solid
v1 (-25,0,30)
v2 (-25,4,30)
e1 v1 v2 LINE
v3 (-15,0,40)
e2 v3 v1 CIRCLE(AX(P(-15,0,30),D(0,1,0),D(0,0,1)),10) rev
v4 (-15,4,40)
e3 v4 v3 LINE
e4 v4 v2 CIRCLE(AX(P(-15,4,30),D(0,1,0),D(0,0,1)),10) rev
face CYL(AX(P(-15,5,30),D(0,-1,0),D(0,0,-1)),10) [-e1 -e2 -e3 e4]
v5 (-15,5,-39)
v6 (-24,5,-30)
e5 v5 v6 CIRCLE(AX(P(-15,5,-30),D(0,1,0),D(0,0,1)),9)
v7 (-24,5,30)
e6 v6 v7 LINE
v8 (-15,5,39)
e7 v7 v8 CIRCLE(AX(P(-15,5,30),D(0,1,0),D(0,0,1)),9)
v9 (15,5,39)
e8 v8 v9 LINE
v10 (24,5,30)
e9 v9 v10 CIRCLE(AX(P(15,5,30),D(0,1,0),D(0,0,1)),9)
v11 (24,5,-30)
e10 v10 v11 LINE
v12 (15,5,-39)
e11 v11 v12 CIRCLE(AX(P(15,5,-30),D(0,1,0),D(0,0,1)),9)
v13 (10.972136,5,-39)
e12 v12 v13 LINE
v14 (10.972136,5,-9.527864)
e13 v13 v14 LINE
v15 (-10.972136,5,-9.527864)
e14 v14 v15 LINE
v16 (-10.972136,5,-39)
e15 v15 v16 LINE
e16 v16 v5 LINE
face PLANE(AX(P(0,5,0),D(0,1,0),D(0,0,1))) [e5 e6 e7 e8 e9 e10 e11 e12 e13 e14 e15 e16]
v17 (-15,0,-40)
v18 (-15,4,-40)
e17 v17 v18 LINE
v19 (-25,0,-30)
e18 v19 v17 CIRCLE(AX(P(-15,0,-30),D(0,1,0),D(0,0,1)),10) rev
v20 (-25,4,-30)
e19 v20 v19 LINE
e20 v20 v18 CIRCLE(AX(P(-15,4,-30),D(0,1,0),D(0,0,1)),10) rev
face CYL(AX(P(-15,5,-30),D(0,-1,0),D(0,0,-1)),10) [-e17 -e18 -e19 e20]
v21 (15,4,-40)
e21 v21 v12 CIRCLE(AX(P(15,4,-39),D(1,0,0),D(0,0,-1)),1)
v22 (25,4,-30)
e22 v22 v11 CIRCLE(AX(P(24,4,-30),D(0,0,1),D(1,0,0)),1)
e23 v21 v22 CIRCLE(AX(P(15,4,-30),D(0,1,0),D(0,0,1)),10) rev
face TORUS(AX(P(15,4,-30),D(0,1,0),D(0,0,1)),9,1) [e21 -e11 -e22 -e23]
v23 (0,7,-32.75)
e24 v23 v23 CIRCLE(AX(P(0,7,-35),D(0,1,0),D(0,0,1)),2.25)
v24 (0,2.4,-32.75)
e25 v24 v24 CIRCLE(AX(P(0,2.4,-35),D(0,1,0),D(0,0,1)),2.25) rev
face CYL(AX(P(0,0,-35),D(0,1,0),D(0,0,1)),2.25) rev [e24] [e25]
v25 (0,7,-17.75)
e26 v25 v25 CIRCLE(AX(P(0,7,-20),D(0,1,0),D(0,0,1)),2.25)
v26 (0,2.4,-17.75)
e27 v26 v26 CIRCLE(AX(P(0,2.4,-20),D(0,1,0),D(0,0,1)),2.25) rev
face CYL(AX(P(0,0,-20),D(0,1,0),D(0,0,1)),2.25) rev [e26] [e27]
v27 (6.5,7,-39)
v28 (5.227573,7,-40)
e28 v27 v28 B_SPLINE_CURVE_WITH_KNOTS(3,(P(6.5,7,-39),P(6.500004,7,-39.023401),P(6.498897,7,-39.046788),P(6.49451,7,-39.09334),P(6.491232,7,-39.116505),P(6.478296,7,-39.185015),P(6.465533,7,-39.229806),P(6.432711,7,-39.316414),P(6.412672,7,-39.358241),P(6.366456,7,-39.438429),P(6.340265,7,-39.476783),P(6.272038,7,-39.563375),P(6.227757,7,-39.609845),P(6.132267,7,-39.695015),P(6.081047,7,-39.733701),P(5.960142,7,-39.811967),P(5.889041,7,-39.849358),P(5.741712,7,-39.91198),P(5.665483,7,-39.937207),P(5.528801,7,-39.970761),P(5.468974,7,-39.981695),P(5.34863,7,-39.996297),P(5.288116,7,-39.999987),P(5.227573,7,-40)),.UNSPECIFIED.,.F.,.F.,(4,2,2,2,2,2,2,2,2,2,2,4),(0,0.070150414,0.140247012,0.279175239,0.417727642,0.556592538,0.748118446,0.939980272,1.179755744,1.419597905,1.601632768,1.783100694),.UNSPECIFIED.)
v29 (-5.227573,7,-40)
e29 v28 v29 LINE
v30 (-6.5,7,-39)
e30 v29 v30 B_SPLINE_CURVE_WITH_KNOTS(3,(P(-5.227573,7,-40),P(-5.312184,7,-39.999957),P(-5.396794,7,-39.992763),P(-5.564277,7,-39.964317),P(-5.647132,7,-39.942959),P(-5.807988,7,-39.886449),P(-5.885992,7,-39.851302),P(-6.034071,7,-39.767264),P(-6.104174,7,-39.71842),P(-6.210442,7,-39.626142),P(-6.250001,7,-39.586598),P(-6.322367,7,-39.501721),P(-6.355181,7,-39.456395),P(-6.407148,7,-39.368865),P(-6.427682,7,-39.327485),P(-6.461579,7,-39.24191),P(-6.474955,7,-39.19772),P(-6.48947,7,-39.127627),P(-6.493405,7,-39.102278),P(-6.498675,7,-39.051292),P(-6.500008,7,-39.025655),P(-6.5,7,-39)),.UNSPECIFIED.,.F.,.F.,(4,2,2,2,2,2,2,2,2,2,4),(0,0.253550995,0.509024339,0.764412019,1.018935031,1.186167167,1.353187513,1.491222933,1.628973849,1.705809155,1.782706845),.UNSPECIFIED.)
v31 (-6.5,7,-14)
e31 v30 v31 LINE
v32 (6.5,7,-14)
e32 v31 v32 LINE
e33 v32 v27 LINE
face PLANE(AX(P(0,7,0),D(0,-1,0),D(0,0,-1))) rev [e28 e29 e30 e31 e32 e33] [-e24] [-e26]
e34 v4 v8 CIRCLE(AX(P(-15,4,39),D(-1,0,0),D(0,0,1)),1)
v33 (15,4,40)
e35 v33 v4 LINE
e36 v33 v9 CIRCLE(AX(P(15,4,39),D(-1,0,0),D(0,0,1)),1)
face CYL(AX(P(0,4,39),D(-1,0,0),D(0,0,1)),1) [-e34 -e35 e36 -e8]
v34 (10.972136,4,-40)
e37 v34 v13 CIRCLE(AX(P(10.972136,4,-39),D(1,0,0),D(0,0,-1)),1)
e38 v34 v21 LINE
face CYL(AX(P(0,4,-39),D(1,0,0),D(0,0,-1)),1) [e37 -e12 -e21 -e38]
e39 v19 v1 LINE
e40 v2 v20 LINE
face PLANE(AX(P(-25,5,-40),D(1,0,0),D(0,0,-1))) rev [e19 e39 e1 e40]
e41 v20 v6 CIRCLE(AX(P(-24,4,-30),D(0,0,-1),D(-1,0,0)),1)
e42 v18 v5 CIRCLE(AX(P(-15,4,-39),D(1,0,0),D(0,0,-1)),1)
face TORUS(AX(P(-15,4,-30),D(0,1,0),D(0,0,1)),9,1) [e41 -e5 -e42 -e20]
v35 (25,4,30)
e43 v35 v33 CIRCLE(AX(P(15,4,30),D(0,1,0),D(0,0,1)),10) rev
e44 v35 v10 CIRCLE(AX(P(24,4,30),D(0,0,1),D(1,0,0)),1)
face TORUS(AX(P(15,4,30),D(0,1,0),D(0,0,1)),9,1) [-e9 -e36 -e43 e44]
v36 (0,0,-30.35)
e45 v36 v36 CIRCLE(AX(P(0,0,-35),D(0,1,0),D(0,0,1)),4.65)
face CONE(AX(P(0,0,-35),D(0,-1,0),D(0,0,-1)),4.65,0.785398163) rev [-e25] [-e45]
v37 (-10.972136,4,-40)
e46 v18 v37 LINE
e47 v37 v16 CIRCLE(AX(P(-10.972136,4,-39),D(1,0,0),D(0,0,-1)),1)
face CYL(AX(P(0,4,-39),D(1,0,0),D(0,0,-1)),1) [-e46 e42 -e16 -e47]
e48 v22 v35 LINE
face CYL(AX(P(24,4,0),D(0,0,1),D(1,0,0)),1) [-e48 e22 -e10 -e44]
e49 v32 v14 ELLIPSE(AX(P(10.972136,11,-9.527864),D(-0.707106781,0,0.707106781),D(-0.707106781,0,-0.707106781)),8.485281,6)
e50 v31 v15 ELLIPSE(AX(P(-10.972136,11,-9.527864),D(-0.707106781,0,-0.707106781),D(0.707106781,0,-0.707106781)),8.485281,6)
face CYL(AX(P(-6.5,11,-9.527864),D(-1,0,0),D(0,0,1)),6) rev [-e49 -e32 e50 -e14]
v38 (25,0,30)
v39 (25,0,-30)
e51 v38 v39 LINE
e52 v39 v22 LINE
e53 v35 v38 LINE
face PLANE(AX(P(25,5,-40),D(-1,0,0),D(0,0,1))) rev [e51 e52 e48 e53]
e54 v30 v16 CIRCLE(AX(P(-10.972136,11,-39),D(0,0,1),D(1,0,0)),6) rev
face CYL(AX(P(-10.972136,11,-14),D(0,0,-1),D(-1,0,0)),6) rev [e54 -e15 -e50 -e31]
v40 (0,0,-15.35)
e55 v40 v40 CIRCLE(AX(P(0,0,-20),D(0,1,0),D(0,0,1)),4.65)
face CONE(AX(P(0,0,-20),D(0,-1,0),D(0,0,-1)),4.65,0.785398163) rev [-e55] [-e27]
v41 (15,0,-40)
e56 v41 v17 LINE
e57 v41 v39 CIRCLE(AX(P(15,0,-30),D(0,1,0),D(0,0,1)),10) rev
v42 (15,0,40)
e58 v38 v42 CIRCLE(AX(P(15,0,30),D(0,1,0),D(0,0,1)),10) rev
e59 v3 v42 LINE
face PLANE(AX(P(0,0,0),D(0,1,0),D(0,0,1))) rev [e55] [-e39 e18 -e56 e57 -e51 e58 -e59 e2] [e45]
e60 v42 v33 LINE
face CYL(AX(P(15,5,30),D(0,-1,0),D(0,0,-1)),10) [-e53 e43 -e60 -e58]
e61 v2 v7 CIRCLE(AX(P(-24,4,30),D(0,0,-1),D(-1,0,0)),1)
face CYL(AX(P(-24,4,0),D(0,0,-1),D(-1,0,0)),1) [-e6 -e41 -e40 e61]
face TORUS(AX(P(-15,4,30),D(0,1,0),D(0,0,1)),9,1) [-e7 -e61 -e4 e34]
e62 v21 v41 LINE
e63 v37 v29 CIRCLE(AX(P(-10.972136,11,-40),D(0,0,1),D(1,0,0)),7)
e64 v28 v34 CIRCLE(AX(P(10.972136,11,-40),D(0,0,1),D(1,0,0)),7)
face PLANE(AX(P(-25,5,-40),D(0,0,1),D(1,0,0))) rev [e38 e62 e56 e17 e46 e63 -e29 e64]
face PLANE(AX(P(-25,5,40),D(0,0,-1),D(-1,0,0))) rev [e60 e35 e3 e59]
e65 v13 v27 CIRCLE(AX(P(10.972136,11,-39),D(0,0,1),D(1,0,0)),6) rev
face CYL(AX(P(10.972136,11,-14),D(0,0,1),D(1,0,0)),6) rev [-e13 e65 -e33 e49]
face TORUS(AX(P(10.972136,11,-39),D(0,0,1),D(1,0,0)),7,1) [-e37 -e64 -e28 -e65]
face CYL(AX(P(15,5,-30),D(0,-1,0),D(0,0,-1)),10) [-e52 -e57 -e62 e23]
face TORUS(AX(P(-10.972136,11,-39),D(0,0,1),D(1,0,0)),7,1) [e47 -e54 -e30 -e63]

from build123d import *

# Parameters (mm, degrees)
SKETCH1_W           = 50
SKETCH1_H           = 80
BOSS_EXTRUDE1_DEPTH = 5
SKETCH2_W           = 13
SKETCH2_H           = 26
BOSS_EXTRUDE2_DEPTH = 2
SKETCH3_R           = 2.25
CUT_EXTRUDE1_DEPTH  = 48.68647607
FILLET1_R           = 10
FILLET2_R           = 6
FILLET3_R           = 1
CHAMFER1_SIZE       = 2.4


with BuildPart() as part:
    # Sketch1 → Boss-Extrude1 (new body)
    with BuildSketch(Plane(origin=(0, 0, 0), x_dir=(1, 0, 0), z_dir=(0, 1, 0))):
        Rectangle(SKETCH1_W, SKETCH1_H)
    extrude(amount=BOSS_EXTRUDE1_DEPTH)

    # Sketch2 → Boss-Extrude2 (add)
    with BuildSketch(Plane(origin=(0, 5, 0), x_dir=(1, 0, 0), z_dir=(0, 1, 0))):
        with Locations((0, 27)):
            Rectangle(SKETCH2_W, SKETCH2_H)
    extrude(amount=BOSS_EXTRUDE2_DEPTH)

    # Sketch3 → Cut-Extrude1 (cut, through all)
    with BuildSketch(Plane(origin=(0, 7, 0), x_dir=(1, 0, 0), z_dir=(0, 1, 0))):
        with Locations(Location((0, 35, 0), (0, 0, 270))):
            Circle(SKETCH3_R)
        with Locations(Location((0, 20, 0), (0, 0, 270))):
            Circle(SKETCH3_R)
    extrude(amount=-CUT_EXTRUDE1_DEPTH, mode=Mode.SUBTRACT)

    # Fillet1
    fillet1_edges = [part.edges().sort_by_distance(p)[0] for p in [
        (25, 2.5, 40),
        (-25, 2.5, 40),
        (-25, 2.5, -40),
        (25, 2.5, -40),
    ]]
    fillet(fillet1_edges, radius=FILLET1_R)

    # Fillet2
    # the kernel refuses this fillet: 6 mm, written as the material it adds along each edge
    with BuildSketch(Plane(origin=(6.5, 5, -14), x_dir=(1, 0, 0), z_dir=(0, 0, -1)), Plane(origin=(-6.5, 5, -40), x_dir=(-1, 0, 0), z_dir=(0, 0, 1))) as fillet2_piece_1:
        with BuildLine():
            CenterArc((4.472135955, -6), FILLET2_R, 90, 48.189685104)
            Line((0, -2), (-0.089442719, -1.92))
            ThreePointArc((-0.089442719, -1.92), (-0.12, -1), (-0.12, 0))
            Line((-0.12, 0), (0, 0.12))
            Line((0, 0.12), (4.472135955, 0.12))
            Line((4.472135955, 0.12), (4.472135955, 0))
        make_face()
    extrude(amount=26)
    with BuildSketch(Plane(origin=(-6.5, 5, -14), x_dir=(0, 0, 1), z_dir=(1, 0, 0))) as fillet2_piece_2:
        with BuildLine():
            CenterArc((4.472135955, -6), FILLET2_R, 90, 48.189685104)
            Line((0, -2), (-0.089442719, -1.92))
            ThreePointArc((-0.089442719, -1.92), (-0.12, -1), (-0.12, 0))
            Line((-0.12, 0), (0, 0.12))
            Line((0, 0.12), (4.472135955, 0.12))
            Line((4.472135955, 0.12), (4.472135955, 0))
        make_face()
    extrude(amount=13)
    with BuildSketch(Plane(origin=(-6.5, 5, -14), x_dir=(0, 0, 1), z_dir=(1, 0, 0))) as fillet2_piece_3a_section:
        with BuildLine():
            CenterArc((4.472135955, -6), FILLET2_R, 90, 48.189685104)
            Line((0, -2), (-0.089442719, -1.92))
            ThreePointArc((-0.089442719, -1.92), (-0.12, -1), (-0.12, 0))
            Line((-0.12, 0), (0, 0.12))
            Line((0, 0.12), (4.472135955, 0.12))
            Line((4.472135955, 0.12), (4.472135955, 0))
        make_face()
    fillet2_piece_3a = extrude(amount=24.180339887, mode=Mode.PRIVATE)
    fillet2_piece_3a = split(fillet2_piece_3a, bisect_by=Plane(origin=(6.5, 5.502082099, -12.82079949), z_dir=(1, 0, 0)), keep=Keep.TOP, mode=Mode.PRIVATE)
    with BuildSketch(Plane(origin=(6.5, 5, -2.819660113), x_dir=(1, 0, 0), z_dir=(0, 0, -1))) as fillet2_piece_3b_section:
        with BuildLine():
            CenterArc((4.472135955, -6), FILLET2_R, 90, 48.189685104)
            Line((0, -2), (-0.089442719, -1.92))
            ThreePointArc((-0.089442719, -1.92), (-0.12, -1), (-0.12, 0))
            Line((-0.12, 0), (0, 0.12))
            Line((0, 0.12), (4.472135955, 0.12))
            Line((4.472135955, 0.12), (4.472135955, 0))
        make_face()
    fillet2_piece_3b = extrude(amount=37.180339887, mode=Mode.PRIVATE)
    fillet2_piece_3b = split(fillet2_piece_3b, bisect_by=Plane(origin=(7.67920051, 5.502082099, -14), z_dir=(0, 0, 1)), keep=Keep.TOP, mode=Mode.PRIVATE)
    fillet2_piece_3 = fillet2_piece_3a & fillet2_piece_3b
    add(fillet2_piece_3)
    with BuildSketch(Plane(origin=(-6.5, 5, -40), x_dir=(-1, 0, 0), z_dir=(0, 0, 1))) as fillet2_piece_4a_section:
        with BuildLine():
            CenterArc((4.472135955, -6), FILLET2_R, 90, 48.189685104)
            Line((0, -2), (-0.089442719, -1.92))
            ThreePointArc((-0.089442719, -1.92), (-0.12, -1), (-0.12, 0))
            Line((-0.12, 0), (0, 0.12))
            Line((0, 0.12), (4.472135955, 0.12))
            Line((4.472135955, 0.12), (4.472135955, 0))
        make_face()
    fillet2_piece_4a = extrude(amount=37.180339887, mode=Mode.PRIVATE)
    fillet2_piece_4a = split(fillet2_piece_4a, bisect_by=Plane(origin=(-7.67920051, 5.502082099, -14), z_dir=(0, 0, 1)), keep=Keep.TOP, mode=Mode.PRIVATE)
    with BuildSketch(Plane(origin=(-17.680339887, 5, -14), x_dir=(0, 0, 1), z_dir=(1, 0, 0))) as fillet2_piece_4b_section:
        with BuildLine():
            CenterArc((4.472135955, -6), FILLET2_R, 90, 48.189685104)
            Line((0, -2), (-0.089442719, -1.92))
            ThreePointArc((-0.089442719, -1.92), (-0.12, -1), (-0.12, 0))
            Line((-0.12, 0), (0, 0.12))
            Line((0, 0.12), (4.472135955, 0.12))
            Line((4.472135955, 0.12), (4.472135955, 0))
        make_face()
    fillet2_piece_4b = extrude(amount=24.180339887, mode=Mode.PRIVATE)
    fillet2_piece_4b = split(fillet2_piece_4b, bisect_by=Plane(origin=(-6.5, 5.502082099, -12.82079949), z_dir=(-1, 0, 0)), keep=Keep.TOP, mode=Mode.PRIVATE)
    fillet2_piece_4 = fillet2_piece_4a & fillet2_piece_4b
    add(fillet2_piece_4)

    # Fillet3
    fillet3_edges = [part.edges().sort_by_distance(p)[0] for p in [
        (12.986067978, 5, -40),
        (25, 5, 0),
        (-25, 5, 0),
        (0, 5, 40),
        (-22.071067812, 5, -37.071067812),
        (-22.071067812, 5, 37.071067812),
        (22.071067812, 5, 37.071067812),
        (22.071067812, 5, -37.071067812),
        (-12.986067977, 5, -40),
        (8.522646212, 5.522774425, -40),
        (-8.522646212, 5.522774425, -40),
    ]]
    fillet(fillet3_edges, radius=FILLET3_R)

    # Chamfer1
    chamfer1_edges = [part.edges().sort_by_distance(p)[0] for p in [
        (0, 0, -37.25),
        (0, 0, -22.25),
    ]]
    chamfer(chamfer1_edges, length=CHAMFER1_SIZE)


solid = part.part
